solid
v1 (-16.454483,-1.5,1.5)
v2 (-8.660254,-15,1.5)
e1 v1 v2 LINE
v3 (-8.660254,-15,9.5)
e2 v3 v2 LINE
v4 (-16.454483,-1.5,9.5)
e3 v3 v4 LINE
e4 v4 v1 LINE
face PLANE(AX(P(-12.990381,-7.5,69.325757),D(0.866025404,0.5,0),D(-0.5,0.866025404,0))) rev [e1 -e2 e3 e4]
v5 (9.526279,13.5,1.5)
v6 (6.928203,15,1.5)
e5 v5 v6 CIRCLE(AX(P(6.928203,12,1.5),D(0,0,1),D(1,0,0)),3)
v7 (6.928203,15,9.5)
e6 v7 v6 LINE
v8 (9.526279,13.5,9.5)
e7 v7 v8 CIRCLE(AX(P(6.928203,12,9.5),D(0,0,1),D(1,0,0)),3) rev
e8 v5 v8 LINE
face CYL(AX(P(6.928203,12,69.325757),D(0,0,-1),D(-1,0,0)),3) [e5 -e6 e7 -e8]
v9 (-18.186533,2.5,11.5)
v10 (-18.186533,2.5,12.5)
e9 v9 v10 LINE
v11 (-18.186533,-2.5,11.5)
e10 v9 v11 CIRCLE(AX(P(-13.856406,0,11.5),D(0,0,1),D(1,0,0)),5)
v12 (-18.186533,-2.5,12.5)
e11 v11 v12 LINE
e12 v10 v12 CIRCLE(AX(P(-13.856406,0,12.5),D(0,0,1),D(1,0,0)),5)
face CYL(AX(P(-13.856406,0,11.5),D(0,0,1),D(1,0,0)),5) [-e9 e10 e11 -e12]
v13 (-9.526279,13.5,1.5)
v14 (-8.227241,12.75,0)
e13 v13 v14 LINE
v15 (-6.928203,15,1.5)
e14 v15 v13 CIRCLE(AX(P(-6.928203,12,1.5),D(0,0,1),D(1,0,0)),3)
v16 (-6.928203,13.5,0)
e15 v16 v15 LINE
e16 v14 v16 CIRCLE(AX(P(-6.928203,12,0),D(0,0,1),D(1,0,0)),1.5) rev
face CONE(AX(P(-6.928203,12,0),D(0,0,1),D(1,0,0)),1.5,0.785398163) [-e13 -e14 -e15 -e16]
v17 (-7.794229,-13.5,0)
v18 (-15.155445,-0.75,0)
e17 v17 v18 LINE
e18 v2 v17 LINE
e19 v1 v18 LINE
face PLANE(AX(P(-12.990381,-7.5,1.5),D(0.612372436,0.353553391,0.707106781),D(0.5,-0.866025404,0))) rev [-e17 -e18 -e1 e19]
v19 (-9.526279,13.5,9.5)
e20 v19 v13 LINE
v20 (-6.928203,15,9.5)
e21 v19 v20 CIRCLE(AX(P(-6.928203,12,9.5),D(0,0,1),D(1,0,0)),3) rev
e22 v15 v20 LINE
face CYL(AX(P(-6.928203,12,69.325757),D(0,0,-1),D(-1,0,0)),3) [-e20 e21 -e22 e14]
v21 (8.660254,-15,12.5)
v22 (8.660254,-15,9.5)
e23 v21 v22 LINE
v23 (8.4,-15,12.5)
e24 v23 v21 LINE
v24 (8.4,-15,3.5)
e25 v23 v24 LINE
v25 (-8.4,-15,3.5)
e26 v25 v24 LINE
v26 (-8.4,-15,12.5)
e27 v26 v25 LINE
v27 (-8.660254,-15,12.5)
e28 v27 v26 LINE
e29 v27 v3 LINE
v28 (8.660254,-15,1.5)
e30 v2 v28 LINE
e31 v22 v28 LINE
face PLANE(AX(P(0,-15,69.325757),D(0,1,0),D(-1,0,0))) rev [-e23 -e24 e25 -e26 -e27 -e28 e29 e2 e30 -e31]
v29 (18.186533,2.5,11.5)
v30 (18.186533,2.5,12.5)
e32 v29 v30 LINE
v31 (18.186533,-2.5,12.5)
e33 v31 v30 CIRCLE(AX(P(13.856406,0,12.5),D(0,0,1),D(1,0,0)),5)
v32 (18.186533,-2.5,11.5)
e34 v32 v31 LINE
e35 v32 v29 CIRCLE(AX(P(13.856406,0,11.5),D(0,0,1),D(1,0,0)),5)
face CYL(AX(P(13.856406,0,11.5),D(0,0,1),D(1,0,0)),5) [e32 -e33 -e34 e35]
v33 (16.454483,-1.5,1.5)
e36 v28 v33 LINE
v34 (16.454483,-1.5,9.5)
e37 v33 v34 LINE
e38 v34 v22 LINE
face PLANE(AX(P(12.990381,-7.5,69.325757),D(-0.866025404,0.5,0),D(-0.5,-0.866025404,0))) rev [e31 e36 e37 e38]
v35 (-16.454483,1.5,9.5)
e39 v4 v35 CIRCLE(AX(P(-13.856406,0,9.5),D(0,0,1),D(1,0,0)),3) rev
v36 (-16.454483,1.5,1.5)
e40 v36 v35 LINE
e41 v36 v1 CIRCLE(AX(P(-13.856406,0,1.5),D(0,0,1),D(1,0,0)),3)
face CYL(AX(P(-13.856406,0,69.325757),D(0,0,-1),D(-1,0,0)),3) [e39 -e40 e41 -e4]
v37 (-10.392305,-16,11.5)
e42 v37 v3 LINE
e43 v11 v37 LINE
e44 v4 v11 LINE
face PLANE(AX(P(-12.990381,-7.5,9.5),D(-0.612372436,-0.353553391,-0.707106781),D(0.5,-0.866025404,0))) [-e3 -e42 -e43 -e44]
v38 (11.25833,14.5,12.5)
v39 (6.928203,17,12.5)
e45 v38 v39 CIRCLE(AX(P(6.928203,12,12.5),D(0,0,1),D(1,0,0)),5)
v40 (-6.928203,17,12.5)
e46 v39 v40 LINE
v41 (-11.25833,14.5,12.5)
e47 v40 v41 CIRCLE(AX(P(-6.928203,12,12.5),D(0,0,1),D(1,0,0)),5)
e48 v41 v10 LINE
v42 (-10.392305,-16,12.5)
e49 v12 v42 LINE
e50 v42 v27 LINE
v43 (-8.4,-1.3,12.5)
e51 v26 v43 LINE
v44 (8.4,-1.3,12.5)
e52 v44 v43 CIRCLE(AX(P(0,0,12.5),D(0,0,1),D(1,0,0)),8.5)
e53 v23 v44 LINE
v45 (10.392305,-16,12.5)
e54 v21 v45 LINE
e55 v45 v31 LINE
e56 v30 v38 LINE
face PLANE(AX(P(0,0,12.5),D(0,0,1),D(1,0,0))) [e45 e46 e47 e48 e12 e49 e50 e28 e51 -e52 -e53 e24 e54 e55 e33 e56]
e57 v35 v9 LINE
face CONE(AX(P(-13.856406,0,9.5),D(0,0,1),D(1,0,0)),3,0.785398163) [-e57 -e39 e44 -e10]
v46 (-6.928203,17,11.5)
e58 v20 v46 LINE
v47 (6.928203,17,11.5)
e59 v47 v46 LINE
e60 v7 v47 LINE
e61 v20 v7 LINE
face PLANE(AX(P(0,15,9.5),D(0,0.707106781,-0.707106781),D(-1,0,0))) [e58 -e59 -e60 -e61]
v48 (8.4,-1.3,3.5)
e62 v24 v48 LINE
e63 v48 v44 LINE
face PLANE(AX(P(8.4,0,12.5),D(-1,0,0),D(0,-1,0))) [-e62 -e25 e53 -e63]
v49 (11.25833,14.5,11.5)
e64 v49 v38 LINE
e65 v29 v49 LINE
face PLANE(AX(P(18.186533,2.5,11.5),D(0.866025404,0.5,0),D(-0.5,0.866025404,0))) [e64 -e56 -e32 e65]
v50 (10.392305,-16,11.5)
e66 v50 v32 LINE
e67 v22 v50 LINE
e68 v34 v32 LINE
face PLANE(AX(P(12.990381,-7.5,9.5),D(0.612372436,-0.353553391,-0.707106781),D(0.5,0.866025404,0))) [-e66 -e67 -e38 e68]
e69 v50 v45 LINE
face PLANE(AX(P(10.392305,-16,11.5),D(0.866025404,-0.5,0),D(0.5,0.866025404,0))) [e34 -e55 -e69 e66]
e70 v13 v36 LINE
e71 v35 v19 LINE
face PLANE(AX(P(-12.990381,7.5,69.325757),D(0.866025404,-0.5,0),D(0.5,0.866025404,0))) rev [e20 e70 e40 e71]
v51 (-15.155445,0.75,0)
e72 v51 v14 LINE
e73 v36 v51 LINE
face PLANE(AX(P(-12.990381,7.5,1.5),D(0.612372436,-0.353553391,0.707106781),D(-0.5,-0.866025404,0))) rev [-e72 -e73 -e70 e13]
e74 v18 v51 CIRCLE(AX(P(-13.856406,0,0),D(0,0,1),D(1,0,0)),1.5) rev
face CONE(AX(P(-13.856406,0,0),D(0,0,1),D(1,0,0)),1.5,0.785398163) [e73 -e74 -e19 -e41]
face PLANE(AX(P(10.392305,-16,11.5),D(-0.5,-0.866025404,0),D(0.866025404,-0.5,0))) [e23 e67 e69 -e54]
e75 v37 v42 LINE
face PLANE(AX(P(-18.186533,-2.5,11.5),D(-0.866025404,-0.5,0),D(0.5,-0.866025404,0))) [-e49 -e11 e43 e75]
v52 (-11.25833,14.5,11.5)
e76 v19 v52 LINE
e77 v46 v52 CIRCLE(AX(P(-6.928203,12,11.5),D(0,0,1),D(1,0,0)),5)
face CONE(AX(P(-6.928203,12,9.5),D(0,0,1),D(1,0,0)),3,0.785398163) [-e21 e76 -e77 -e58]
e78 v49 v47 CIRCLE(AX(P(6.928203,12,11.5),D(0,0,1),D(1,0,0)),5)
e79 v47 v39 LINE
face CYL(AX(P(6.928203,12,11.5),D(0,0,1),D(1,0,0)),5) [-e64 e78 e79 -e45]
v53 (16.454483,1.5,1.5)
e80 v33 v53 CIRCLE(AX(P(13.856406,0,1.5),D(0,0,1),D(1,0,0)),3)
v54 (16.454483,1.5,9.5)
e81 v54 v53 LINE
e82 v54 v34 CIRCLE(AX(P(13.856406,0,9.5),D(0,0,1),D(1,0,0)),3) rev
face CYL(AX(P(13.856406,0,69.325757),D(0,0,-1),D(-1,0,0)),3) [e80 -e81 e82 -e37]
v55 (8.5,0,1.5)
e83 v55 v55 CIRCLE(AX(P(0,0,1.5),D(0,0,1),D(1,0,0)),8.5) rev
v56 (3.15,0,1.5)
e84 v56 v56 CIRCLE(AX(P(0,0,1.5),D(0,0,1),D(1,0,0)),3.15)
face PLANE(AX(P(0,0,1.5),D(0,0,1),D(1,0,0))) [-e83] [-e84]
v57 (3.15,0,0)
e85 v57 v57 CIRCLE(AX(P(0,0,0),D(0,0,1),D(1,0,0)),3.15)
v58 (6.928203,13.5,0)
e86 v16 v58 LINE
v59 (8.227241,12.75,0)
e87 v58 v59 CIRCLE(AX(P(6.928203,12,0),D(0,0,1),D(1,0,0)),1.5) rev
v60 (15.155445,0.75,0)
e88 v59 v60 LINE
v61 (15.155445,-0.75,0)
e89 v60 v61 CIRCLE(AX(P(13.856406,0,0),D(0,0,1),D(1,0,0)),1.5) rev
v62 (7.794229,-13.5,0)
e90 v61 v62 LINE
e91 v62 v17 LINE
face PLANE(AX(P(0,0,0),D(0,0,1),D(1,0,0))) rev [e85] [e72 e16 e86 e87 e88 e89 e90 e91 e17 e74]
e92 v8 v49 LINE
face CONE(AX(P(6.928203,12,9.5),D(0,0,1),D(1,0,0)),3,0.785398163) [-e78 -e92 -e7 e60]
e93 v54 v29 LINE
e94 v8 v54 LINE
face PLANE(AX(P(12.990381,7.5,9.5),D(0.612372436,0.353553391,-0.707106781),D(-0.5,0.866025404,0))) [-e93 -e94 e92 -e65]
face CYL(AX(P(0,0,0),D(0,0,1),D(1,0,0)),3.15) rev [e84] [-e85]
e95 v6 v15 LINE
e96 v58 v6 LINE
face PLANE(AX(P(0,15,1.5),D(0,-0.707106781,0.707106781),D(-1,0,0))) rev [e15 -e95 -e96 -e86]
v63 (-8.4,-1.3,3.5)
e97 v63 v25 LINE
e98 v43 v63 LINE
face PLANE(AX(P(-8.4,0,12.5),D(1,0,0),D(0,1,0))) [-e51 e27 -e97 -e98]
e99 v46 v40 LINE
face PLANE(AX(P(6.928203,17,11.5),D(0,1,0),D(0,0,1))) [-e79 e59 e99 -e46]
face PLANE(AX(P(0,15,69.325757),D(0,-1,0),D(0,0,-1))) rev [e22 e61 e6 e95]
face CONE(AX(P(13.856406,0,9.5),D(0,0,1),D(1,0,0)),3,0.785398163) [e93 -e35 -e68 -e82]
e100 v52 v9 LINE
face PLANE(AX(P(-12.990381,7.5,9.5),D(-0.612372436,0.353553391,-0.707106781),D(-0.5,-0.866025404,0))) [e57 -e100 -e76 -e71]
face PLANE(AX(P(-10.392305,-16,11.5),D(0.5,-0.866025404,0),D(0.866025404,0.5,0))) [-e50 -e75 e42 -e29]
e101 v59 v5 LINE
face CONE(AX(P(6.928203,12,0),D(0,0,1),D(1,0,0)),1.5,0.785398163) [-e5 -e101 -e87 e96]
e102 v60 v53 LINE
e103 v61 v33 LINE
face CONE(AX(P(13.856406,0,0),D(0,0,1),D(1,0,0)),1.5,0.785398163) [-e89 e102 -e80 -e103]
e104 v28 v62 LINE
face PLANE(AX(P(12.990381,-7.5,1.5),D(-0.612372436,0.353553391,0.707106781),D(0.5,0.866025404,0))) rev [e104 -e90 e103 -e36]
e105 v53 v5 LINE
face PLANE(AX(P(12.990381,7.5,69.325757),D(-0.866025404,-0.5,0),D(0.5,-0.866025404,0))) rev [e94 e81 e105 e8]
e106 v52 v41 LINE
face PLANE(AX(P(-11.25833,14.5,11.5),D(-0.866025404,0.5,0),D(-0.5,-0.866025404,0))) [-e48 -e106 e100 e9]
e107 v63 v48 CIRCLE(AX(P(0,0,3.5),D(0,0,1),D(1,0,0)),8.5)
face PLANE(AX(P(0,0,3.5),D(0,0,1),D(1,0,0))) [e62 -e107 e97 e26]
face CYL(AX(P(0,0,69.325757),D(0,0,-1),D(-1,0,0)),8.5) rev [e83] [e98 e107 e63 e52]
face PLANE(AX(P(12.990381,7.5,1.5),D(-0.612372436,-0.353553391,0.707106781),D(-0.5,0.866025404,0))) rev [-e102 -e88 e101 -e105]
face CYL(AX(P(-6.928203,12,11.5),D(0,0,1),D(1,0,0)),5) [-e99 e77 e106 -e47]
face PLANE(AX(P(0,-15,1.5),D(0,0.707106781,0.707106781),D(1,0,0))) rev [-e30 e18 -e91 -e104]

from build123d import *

# Parameters (mm, degrees)
SKETCH1_R           = 8.5
BOSS_EXTRUDE1_DEPTH = 1.5
SKETCH1_4_R         = 15
SKETCH1_4_R_2       = 8.5
BOSS_EXTRUDE2_DEPTH = 12.5
CUT_EXTRUDE1_START  = 2
SKETCH2_W           = 16.8
SKETCH2_H           = 15
CUT_EXTRUDE1_DEPTH  = 24.416530054
FILLET1_R           = 3
SKETCH3_R           = 3.15
CUT_EXTRUDE2_DEPTH  = 26.102558411
FILLET3_SIZE        = 1.5
BOSS_EXTRUDE3_DEPTH = 1
CHAMFER1_SIZE       = 2


with BuildPart() as part:
    # Sketch1 → Boss-Extrude1 (new body)
    with BuildSketch(Plane.XY):
        Circle(SKETCH1_R)
    extrude(amount=BOSS_EXTRUDE1_DEPTH)

    # Sketch1<4> → Boss-Extrude2 (add)
    # profile 1 of 7: a face of its own
    with BuildSketch(Plane.XY):
        Circle(SKETCH1_4_R)
        with Locations(Location((0, 0, 0), (0, 0, 180))):
            Circle(SKETCH1_4_R_2, mode=Mode.SUBTRACT)
    # profile 2 of 7: a face of its own
    with BuildSketch(Plane.XY):
        with BuildLine():
            Line((12.990381063, 7.499999988), (8.660254038, 15))
            Line((8.660254038, 15), (-1.6e-08, 15))
            ThreePointArc((-1.6e-08, 15), (7.499999999, 12.990381058), (12.990381063, 7.499999988))
        make_face()
    # profile 3 of 7: a face of its own
    with BuildSketch(Plane.XY):
        with BuildLine():
            ThreePointArc((-12.99038099, 7.500000116), (-7.499999949, 12.990381086), (-1.6e-08, 15))
            Line((-1.6e-08, 15), (-8.660254038, 15))
            Line((-8.660254038, 15), (-12.99038099, 7.500000116))
        make_face()
    # profile 4 of 7: a face of its own
    with BuildSketch(Plane.XY):
        with BuildLine():
            ThreePointArc((-12.990380876, -7.500000313), (-15, -1.14e-07), (-12.99038099, 7.500000116))
            Line((-12.99038099, 7.500000116), (-17.320508076, 0))
            Line((-17.320508076, 0), (-12.990380876, -7.500000313))
        make_face()
    # profile 5 of 7: a face of its own
    with BuildSketch(Plane.XY):
        with BuildLine():
            Line((17.320508076, 0), (12.990381063, 7.499999988))
            ThreePointArc((12.990381063, 7.499999988), (14.488887396, 3.88228567), (15, 0))
            ThreePointArc((15, 0), (14.488887391, -3.88228569), (12.990381043, -7.500000024))
            Line((12.990381043, -7.500000024), (17.320508076, 0))
        make_face()
    # profile 6 of 7: a face of its own
    with BuildSketch(Plane.XY):
        with BuildLine():
            Line((8.660254038, -15), (12.990381043, -7.500000024))
            ThreePointArc((12.990381043, -7.500000024), (7.499999988, -12.990381064), (0, -15))
            Line((0, -15), (8.660254038, -15))
        make_face()
    # profile 7 of 7: a face of its own
    with BuildSketch(Plane.XY):
        with BuildLine():
            ThreePointArc((0, -15), (-7.499999843, -12.990381147), (-12.990380876, -7.500000313))
            Line((-12.990380876, -7.500000313), (-8.660254038, -15))
            Line((-8.660254038, -15), (0, -15))
        make_face()
    extrude(amount=BOSS_EXTRUDE2_DEPTH)

    # Sketch2 → Cut-Extrude1 (cut, through all)
    with BuildSketch(Plane.XY.offset(1.5).offset(CUT_EXTRUDE1_START)):
        with Locations((0, -7.5)):
            Rectangle(SKETCH2_W, SKETCH2_H)
    extrude(amount=CUT_EXTRUDE1_DEPTH, mode=Mode.SUBTRACT)

    # Fillet1
    fillet1_edges = [part.edges().sort_by_distance(p)[0] for p in [
        (17.320508076, 0, 6.25),
        (8.660254038, 15, 6.25),
        (-8.660254038, 15, 6.25),
        (-17.320508076, 0, 6.25),
    ]]
    fillet(fillet1_edges, radius=FILLET1_R)

    # Sketch3 → Cut-Extrude2 (cut, through all)
    with BuildSketch(Plane.XY.offset(1.5)):
        Circle(SKETCH3_R)
    extrude(amount=-CUT_EXTRUDE2_DEPTH, mode=Mode.SUBTRACT)

    # Fillet3
    fillet3_edges = [part.edges().sort_by_distance(p)[0] for p in [
        (-12.557368355, -8.25, 0),
        (12.990381057, 7.5, 0),
        (-12.990381057, 7.5, 0),
        (0, 15, 0),
        (16.856406461, 0, 0),
        (8.42820323, 14.598076211, 0),
        (-8.42820323, 14.598076211, 0),
        (-16.856406461, 0, 0),
        (0, -15, 0),
        (12.557368355, -8.25, 0),
    ]]
    chamfer(fillet3_edges, length=FILLET3_SIZE)

    # Sketch5 → Boss-Extrude3 (add)
    with BuildSketch(Plane.XY.offset(12.5)):
        with BuildLine():
            Line((-10.392304845, -16), (-8.660254038, -15))
            Line((-8.660254038, -15), (-16.454482672, -1.5))
            ThreePointArc((-16.454482672, -1.5), (-16.856406461, 0), (-16.454482672, 1.5))
            Line((-16.454482672, 1.5), (-9.526279442, 13.5))
            ThreePointArc((-9.526279442, 13.5), (-8.42820323, 14.598076211), (-6.92820323, 15))
            Line((-6.92820323, 15), (6.92820323, 15))
            ThreePointArc((6.92820323, 15), (8.42820323, 14.598076211), (9.526279442, 13.5))
            Line((9.526279442, 13.5), (16.454482672, 1.5))
            ThreePointArc((16.454482672, 1.5), (16.856406461, 0), (16.454482672, -1.5))
            Line((16.454482672, -1.5), (8.660254038, -15))
            Line((8.660254038, -15), (10.392304845, -16))
            Line((10.392304845, -16), (18.186533479, -2.5))
            ThreePointArc((18.186533479, -2.5), (18.856406461, 0), (18.186533479, 2.5))
            Line((18.186533479, 2.5), (11.258330249, 14.5))
            ThreePointArc((11.258330249, 14.5), (9.42820323, 16.330127019), (6.92820323, 17))
            Line((6.92820323, 17), (-6.92820323, 17))
            ThreePointArc((-6.92820323, 17), (-9.42820323, 16.330127019), (-11.258330249, 14.5))
            Line((-11.258330249, 14.5), (-18.186533479, 2.5))
            ThreePointArc((-18.186533479, 2.5), (-18.856406461, 0), (-18.186533479, -2.5))
            Line((-18.186533479, -2.5), (-10.392304845, -16))
        make_face()
    extrude(amount=-BOSS_EXTRUDE3_DEPTH)

    # Chamfer1
    chamfer1_edges = [part.edges().sort_by_distance(p)[0] for p in [
        (12.557368355, -8.25, 11.5),
        (16.856406461, 0, 11.5),
        (12.990381057, 7.5, 11.5),
        (8.42820323, 14.598076211, 11.5),
        (0, 15, 11.5),
        (-8.42820323, 14.598076211, 11.5),
        (-12.990381057, 7.5, 11.5),
        (-16.856406461, 0, 11.5),
        (-12.557368355, -8.25, 11.5),
    ]]
    chamfer(chamfer1_edges, length=CHAMFER1_SIZE - 0.0001)  # a hair under: the kernel refuses the full size


solid = part.part
